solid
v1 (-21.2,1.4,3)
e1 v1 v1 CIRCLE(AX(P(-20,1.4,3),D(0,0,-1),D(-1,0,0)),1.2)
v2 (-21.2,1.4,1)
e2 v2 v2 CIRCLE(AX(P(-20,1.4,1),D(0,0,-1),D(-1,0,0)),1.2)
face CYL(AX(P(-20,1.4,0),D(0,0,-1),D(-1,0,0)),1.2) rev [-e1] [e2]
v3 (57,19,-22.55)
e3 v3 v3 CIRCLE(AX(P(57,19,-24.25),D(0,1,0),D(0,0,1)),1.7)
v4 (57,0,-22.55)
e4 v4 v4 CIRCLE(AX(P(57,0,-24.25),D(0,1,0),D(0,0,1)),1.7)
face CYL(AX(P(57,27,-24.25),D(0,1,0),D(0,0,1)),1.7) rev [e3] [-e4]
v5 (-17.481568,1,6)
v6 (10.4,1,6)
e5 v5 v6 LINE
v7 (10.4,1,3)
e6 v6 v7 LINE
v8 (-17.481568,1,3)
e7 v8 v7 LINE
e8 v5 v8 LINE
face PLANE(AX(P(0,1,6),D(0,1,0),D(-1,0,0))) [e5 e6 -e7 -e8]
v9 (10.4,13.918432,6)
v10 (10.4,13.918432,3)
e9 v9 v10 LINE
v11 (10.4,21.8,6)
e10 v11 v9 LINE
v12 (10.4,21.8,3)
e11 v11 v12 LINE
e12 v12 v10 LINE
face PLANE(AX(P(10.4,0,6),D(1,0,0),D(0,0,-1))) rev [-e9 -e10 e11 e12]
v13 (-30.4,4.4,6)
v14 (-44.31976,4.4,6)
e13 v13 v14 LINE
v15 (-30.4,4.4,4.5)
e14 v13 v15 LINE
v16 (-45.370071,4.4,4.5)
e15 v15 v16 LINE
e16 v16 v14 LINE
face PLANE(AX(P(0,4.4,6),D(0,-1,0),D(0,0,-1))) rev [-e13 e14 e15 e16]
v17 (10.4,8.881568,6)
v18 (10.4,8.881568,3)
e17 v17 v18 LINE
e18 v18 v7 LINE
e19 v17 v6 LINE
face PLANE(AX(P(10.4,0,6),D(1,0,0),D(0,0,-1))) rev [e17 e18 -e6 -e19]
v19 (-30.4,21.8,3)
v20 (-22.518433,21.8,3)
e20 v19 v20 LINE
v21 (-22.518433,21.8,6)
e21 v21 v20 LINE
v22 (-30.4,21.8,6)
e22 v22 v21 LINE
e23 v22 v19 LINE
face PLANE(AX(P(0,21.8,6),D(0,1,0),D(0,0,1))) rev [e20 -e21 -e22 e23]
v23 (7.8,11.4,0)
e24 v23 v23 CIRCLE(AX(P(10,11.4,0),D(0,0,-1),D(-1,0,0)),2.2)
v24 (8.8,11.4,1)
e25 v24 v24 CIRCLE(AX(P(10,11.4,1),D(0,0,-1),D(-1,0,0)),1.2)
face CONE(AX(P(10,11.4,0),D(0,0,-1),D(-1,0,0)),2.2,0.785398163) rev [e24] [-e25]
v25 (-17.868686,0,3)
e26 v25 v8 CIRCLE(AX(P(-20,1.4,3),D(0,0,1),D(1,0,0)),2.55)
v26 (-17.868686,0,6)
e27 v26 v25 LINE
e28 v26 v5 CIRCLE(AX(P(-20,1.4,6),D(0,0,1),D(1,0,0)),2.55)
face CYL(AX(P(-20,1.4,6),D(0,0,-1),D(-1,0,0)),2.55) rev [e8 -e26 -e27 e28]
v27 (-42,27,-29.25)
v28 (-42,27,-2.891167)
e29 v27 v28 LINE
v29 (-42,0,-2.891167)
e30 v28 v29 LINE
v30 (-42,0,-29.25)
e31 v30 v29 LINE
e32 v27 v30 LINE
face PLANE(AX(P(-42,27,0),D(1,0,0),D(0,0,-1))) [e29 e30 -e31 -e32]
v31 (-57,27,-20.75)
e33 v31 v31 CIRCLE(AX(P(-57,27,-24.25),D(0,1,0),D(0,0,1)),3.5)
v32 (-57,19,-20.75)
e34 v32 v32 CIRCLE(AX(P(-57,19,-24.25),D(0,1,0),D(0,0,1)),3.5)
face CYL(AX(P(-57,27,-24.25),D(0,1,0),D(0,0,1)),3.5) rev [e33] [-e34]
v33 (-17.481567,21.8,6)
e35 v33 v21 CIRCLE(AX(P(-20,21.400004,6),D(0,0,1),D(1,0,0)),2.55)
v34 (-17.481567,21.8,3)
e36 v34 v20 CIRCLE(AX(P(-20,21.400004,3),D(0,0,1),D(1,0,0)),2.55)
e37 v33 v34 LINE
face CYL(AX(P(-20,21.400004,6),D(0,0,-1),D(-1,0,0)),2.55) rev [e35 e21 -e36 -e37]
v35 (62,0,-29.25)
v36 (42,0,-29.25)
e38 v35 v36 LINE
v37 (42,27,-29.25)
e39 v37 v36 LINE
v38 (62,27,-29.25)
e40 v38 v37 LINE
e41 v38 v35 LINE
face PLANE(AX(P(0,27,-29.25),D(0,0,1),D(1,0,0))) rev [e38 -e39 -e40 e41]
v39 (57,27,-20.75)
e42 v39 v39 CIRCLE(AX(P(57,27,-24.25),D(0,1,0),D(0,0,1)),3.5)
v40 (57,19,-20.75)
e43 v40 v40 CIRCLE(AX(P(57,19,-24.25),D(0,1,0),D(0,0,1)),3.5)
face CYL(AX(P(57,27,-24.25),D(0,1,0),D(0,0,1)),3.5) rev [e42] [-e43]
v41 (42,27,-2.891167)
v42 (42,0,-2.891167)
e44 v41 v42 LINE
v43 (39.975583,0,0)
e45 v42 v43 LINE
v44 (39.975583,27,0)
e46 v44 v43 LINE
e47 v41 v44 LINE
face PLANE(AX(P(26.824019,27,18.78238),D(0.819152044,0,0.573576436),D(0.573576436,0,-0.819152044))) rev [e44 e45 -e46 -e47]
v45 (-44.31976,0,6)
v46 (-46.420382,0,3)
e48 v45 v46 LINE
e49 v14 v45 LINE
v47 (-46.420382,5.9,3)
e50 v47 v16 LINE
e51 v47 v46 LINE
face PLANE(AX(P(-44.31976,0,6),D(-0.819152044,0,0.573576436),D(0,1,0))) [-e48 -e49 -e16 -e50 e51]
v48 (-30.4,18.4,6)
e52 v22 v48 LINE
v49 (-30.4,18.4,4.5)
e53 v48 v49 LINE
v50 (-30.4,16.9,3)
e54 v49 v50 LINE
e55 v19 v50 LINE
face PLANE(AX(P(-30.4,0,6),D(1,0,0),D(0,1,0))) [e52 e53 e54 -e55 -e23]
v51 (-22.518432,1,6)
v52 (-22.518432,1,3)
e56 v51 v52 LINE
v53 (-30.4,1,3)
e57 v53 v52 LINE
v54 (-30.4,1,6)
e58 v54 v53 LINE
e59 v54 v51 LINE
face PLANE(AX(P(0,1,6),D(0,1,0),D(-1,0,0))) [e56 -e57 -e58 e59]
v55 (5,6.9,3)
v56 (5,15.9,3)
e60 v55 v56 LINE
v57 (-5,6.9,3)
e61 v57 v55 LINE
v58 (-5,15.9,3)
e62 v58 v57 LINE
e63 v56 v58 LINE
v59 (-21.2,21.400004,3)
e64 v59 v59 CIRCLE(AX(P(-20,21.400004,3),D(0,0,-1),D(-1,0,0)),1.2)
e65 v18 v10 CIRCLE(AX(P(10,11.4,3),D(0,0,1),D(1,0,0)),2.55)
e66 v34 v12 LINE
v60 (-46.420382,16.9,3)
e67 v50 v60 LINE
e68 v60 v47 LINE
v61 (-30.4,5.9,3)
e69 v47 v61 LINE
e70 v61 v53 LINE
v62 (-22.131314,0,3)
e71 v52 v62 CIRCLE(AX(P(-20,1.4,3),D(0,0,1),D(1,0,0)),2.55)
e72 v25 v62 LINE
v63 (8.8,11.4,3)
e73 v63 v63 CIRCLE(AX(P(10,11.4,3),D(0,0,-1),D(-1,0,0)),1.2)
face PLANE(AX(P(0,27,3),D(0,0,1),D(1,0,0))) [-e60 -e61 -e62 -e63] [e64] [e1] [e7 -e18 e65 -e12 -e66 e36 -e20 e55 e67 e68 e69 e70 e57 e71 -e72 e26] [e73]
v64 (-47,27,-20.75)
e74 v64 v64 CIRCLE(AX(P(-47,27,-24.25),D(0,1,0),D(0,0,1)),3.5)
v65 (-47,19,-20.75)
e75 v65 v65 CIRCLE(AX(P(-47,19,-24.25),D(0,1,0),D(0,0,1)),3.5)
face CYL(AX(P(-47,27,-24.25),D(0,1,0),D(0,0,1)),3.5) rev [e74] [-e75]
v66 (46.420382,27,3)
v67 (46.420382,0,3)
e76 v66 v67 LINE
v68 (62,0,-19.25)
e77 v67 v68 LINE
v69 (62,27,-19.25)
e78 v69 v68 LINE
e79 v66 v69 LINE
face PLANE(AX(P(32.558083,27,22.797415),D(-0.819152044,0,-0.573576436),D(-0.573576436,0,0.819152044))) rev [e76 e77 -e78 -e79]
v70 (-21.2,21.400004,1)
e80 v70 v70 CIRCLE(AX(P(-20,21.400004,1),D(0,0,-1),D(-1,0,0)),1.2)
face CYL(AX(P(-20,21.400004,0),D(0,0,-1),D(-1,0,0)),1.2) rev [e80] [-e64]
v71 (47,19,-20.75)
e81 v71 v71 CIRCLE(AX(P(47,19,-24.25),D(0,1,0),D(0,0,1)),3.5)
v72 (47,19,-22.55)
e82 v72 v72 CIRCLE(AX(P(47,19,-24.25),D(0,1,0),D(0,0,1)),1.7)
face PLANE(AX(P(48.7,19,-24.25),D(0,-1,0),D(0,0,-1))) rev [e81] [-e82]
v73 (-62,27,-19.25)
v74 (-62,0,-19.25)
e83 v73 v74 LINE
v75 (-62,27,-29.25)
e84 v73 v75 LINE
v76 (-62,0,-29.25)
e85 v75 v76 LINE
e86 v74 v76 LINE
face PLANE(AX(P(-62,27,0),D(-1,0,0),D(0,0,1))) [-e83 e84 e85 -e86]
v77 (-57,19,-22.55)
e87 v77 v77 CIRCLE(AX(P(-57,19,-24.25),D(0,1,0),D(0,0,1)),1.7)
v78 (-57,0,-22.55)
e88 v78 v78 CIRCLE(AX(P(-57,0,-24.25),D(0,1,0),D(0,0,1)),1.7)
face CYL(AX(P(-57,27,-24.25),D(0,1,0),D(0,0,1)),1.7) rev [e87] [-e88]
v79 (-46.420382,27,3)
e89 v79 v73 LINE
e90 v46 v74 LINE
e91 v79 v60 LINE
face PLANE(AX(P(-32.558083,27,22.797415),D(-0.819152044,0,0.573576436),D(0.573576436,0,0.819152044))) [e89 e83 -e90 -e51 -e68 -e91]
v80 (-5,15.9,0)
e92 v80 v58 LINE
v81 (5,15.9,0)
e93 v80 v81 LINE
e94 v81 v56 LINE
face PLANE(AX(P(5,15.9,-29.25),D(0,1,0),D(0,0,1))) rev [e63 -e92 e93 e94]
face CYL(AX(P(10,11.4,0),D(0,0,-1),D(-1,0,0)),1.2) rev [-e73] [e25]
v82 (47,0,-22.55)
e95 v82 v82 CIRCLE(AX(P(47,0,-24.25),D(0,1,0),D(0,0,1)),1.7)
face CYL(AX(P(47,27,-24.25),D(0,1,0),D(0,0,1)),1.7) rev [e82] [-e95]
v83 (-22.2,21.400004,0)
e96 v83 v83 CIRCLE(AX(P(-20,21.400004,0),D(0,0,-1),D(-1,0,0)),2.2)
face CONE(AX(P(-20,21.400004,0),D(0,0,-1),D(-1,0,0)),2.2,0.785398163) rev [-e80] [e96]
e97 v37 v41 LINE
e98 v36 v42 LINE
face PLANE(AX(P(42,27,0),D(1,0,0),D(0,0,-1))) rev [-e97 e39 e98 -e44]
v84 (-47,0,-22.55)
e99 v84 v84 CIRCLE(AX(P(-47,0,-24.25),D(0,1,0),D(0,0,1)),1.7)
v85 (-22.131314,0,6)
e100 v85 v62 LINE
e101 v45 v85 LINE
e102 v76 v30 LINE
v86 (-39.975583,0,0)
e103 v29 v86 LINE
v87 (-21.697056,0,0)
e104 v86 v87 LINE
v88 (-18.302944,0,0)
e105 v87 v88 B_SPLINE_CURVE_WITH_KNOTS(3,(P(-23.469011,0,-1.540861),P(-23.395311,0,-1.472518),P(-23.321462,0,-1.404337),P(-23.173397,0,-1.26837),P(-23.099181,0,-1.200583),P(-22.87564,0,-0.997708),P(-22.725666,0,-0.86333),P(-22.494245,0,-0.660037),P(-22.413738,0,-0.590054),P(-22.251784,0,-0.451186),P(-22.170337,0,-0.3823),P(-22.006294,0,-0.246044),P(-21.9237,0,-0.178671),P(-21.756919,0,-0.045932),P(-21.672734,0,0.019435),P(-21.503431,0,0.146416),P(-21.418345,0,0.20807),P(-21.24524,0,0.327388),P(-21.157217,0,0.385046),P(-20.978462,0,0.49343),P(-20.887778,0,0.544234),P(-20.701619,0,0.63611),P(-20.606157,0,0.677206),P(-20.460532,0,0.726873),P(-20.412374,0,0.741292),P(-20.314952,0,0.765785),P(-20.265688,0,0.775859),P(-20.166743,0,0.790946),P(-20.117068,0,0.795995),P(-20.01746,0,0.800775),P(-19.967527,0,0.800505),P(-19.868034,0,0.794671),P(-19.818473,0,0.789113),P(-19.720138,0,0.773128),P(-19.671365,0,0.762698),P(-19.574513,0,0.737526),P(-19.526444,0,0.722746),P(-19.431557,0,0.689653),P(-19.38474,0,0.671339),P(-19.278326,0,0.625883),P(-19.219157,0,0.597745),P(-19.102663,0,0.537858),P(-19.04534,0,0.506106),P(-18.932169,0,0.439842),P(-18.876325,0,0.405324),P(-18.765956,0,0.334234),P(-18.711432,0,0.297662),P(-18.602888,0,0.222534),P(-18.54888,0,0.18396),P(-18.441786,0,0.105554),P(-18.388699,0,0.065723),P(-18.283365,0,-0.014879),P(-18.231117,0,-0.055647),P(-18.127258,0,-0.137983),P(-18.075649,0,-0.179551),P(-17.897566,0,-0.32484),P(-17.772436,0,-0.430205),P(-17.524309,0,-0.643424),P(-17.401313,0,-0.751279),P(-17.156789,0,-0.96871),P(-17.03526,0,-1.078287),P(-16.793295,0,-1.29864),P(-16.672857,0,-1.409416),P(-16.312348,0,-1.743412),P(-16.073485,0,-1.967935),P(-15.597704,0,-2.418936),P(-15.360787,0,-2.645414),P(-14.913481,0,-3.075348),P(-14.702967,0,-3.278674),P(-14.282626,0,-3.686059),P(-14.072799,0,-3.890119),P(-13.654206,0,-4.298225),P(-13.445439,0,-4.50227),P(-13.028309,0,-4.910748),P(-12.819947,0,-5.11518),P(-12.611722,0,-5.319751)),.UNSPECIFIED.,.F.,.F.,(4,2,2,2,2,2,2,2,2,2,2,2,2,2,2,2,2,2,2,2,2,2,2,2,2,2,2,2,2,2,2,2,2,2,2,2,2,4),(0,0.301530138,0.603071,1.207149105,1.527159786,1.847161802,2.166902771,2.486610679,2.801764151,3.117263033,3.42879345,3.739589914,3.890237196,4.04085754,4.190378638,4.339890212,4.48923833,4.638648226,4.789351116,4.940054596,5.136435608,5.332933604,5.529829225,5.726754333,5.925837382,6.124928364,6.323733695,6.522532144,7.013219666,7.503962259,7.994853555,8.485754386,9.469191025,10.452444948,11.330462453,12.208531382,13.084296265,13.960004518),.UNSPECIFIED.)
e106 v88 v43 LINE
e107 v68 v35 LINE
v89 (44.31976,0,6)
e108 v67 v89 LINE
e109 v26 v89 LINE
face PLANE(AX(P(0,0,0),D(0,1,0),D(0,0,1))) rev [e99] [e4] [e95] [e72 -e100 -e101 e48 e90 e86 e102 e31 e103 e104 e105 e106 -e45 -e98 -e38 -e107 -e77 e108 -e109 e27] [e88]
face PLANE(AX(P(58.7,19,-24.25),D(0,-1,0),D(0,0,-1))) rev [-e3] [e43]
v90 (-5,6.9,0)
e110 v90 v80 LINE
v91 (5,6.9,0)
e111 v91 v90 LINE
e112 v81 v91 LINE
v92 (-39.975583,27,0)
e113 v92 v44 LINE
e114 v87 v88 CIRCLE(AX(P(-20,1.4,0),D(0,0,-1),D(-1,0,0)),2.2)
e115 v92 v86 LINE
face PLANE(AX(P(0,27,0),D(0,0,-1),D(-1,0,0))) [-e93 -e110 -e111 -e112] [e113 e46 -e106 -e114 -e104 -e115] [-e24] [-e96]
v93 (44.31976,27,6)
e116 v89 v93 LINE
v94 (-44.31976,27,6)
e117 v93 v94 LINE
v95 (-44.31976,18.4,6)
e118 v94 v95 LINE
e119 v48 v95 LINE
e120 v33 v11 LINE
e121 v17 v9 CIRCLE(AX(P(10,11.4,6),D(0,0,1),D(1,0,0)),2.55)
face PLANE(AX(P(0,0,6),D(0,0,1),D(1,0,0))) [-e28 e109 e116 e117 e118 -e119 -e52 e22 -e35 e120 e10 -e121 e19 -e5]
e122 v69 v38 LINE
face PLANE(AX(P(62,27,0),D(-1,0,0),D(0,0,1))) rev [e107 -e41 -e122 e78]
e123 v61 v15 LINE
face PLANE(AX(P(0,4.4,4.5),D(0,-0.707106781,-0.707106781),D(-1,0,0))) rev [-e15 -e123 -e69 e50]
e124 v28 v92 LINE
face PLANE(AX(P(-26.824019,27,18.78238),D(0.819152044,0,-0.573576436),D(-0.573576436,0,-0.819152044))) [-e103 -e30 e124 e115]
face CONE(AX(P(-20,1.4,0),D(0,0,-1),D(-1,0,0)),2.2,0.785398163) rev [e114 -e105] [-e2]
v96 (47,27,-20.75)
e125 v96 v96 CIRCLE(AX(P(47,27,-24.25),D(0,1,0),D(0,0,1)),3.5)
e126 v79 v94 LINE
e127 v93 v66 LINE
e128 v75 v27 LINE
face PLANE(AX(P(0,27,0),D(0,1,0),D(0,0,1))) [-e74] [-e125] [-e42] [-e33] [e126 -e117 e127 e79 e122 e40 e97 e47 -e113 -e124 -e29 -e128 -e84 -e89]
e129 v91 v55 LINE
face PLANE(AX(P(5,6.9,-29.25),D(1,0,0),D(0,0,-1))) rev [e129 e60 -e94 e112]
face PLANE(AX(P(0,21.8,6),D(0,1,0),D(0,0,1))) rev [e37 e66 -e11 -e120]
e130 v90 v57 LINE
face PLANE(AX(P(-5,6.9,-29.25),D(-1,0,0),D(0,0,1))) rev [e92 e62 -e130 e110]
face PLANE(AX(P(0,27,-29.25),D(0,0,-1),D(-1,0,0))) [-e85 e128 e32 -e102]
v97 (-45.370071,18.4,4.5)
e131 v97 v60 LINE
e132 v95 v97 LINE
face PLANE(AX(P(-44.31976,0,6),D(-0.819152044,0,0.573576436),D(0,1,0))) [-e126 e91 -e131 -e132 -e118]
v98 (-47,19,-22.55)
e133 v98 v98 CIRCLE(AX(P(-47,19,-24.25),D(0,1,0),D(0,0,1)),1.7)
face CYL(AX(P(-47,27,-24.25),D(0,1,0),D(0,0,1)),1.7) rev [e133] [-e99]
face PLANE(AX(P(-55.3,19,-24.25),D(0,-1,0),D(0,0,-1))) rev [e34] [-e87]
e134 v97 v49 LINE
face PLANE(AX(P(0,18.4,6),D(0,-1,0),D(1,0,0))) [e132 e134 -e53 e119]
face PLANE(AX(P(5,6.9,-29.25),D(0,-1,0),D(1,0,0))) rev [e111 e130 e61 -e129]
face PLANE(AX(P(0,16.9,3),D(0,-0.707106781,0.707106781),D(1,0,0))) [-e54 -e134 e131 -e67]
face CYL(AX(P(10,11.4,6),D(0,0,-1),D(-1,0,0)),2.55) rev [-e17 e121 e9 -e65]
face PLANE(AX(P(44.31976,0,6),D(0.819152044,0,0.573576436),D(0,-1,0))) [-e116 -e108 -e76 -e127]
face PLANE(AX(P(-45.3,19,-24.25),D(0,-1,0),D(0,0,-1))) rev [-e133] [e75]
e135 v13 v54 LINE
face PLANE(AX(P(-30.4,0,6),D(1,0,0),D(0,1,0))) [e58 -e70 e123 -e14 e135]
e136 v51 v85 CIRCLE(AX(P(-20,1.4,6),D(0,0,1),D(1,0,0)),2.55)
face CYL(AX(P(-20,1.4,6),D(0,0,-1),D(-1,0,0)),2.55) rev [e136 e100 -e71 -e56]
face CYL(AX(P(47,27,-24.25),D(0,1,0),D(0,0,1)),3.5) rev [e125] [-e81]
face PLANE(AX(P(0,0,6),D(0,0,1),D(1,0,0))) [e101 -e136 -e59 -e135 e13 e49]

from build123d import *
from OCP.BRepFilletAPI import BRepFilletAPI_MakeChamfer

# Parameters (mm, degrees)
BOSS_EXTRUDE1_DEPTH                                 = 27
SKETCH2_W                                           = 10
SKETCH2_H                                           = 9
CUT_EXTRUDE1_DEPTH                                  = 75.920374398
CBORE_FOR_M3_PAN_HEAD_SCREW1_D                      = 3.4
CBORE_FOR_M3_PAN_HEAD_SCREW1_CBORE_D                = 7
CBORE_FOR_M3_PAN_HEAD_SCREW1_CBORE_DEPTH            = 8
CSK_FOR_M2_COUNTERSUNK_FLAT_HEAD_SCREW1_D           = 2.4
CSK_FOR_M2_COUNTERSUNK_FLAT_HEAD_SCREW1_CSINK_D     = 4.4
CSK_FOR_M2_COUNTERSUNK_FLAT_HEAD_SCREW1_CSINK_ANGLE = 90
BOSS_EXTRUDE2_DEPTH                                 = 3
CHAMFER1_SIZE                                       = 1.5
CHAMFER2_SIZE                                       = 3
CHAMFER2_SIZE_2                                     = 2.100622615


with BuildPart() as part:
    # Sketch1 → Boss-Extrude1 (new body)
    with BuildSketch(Plane(origin=(0, 0, 0), x_dir=(1, 0, 0), z_dir=(0, 1, 0))):
        Polygon((39.975582768, 0), (0, 0), (0, -3), (46.420382275, -3), (62, 19.25), (62, 29.25), (42, 29.25), (42, 2.891167435), align=None)
        Polygon((0, -3), (0, 0), (-39.975582768, 0), (-42, 2.891167435), (-42, 29.25), (-62, 29.25), (-62, 19.25), (-46.420382275, -3), align=None)
    extrude(amount=BOSS_EXTRUDE1_DEPTH)

    # Sketch2 → Cut-Extrude1 (cut, through all)
    with BuildSketch(Plane.XY.offset(3)):
        with Locations((0, 11.4)):
            Rectangle(SKETCH2_W, SKETCH2_H)
    extrude(amount=-CUT_EXTRUDE1_DEPTH, mode=Mode.SUBTRACT)

    # CBORE for M3 Pan Head Screw1 (through all)
    with Locations(Plane(origin=(0, 27, 0), x_dir=(1, 0, 0), z_dir=(0, 1, 0))):
        with Locations((-57, 24.25), (-47, 24.25), (47, 24.25), (57, 24.25)):
            CounterBoreHole(CBORE_FOR_M3_PAN_HEAD_SCREW1_D / 2, CBORE_FOR_M3_PAN_HEAD_SCREW1_CBORE_D / 2, CBORE_FOR_M3_PAN_HEAD_SCREW1_CBORE_DEPTH)

    # CSK for M2 Countersunk Flat Head Screw1 (through all)
    with Locations(Plane(origin=(0, 0, 0), x_dir=(1, 0, 0), z_dir=(0, 0, -1))):
        with Locations((-20, -21.400004303), (-20, -1.4), (10, -11.4)):
            CounterSinkHole(CSK_FOR_M2_COUNTERSUNK_FLAT_HEAD_SCREW1_D / 2, CSK_FOR_M2_COUNTERSUNK_FLAT_HEAD_SCREW1_CSINK_D / 2, counter_sink_angle=CSK_FOR_M2_COUNTERSUNK_FLAT_HEAD_SCREW1_CSINK_ANGLE)

    # Sketch7 → Boss-Extrude2 (add)
    with BuildSketch(Plane.XY.offset(3)):
        with BuildLine():
            Line((-30.4, 18.4), (-30.4, 21.8))
            Line((-30.4, 21.8), (-22.518432735, 21.8))
            ThreePointArc((-22.518432735, 21.8), (-20, 23.950004303), (-17.481567265, 21.8))
            Line((-17.481567265, 21.8), (10.4, 21.8))
            Line((10.4, 21.8), (10.4, 13.918432052))
            ThreePointArc((10.4, 13.918432052), (11.939394235, 13.055672069), (12.55, 11.4))
            ThreePointArc((12.55, 11.4), (11.939394235, 9.744327931), (10.4, 8.881567948))
            Line((10.4, 8.881567948), (10.4, 1))
            Line((10.4, 1), (-17.481567948, 1))
            ThreePointArc((-17.481567948, 1), (-17.621968265, 0.479421341), (-17.868685851, 0))
            Line((-17.868685851, 0), (46.420382275, 0))
            Line((46.420382275, 0), (46.420382275, 27))
            Line((46.420382275, 27), (-46.420382275, 27))
            Line((-46.420382275, 27), (-46.420382275, 18.4))
            Line((-46.420382275, 18.4), (-30.4, 18.4))
        make_face()
        with BuildLine():
            Line((-30.4, 1), (-30.4, 4.4))
            Line((-30.4, 4.4), (-46.420382275, 4.4))
            Line((-46.420382275, 4.4), (-46.420382275, 0))
            Line((-46.420382275, 0), (-22.131314149, 0))
            ThreePointArc((-22.131314149, 0), (-22.378031735, 0.479421341), (-22.518432052, 1))
            Line((-22.518432052, 1), (-30.4, 1))
        make_face()
    extrude(amount=BOSS_EXTRUDE2_DEPTH)

    # Chamfer1
    chamfer1_edges = [part.edges().sort_by_distance(p)[0] for p in [
        (-38.410191137, 18.4, 3),
        (-38.410191137, 4.4, 3),
    ]]
    chamfer(chamfer1_edges, length=CHAMFER1_SIZE)

    # Chamfer2
    chamfer2_edges_1 = [part.edges().sort_by_distance(p)[0] for p in [
        (46.420382275, 13.5, 6),
    ]]
    chamfer2_side_1 = [part.faces().sort_by_distance(p)[0] for p in [
        (46.420382275, 13.5, 5.957987548),
    ]]
    chamfer2_edges_2 = [part.edges().sort_by_distance(p)[0] for p in [
        (-46.420382275, 22.7, 6),
    ]]
    chamfer2_side_2 = [part.faces().sort_by_distance(p)[0] for p in [
        (-46.378369823, 22.7, 6),
    ]]
    chamfer2_edges_3 = [part.edges().sort_by_distance(p)[0] for p in [
        (-46.420382275, 2.2, 6),
    ]]
    chamfer2_side_3 = [part.faces().sort_by_distance(p)[0] for p in [
        (-46.378369823, 2.2, 6),
    ]]
    chamfer2 = BRepFilletAPI_MakeChamfer(part.part.solid().wrapped)
    for e in chamfer2_edges_1:
        chamfer2.Add(CHAMFER2_SIZE - 0.0001, CHAMFER2_SIZE_2 - 0.0001, e.wrapped, chamfer2_side_1[0].wrapped)
    for e in chamfer2_edges_2:
        chamfer2.Add(CHAMFER2_SIZE_2 - 0.0001, CHAMFER2_SIZE - 0.0001, e.wrapped, chamfer2_side_2[0].wrapped)
    for e in chamfer2_edges_3:
        chamfer2.Add(CHAMFER2_SIZE_2 - 0.0001, CHAMFER2_SIZE - 0.0001, e.wrapped, chamfer2_side_3[0].wrapped)
    add(Compound.cast(chamfer2.Shape()), mode=Mode.REPLACE)  # a hair under: the kernel refuses the full size


solid = part.part
